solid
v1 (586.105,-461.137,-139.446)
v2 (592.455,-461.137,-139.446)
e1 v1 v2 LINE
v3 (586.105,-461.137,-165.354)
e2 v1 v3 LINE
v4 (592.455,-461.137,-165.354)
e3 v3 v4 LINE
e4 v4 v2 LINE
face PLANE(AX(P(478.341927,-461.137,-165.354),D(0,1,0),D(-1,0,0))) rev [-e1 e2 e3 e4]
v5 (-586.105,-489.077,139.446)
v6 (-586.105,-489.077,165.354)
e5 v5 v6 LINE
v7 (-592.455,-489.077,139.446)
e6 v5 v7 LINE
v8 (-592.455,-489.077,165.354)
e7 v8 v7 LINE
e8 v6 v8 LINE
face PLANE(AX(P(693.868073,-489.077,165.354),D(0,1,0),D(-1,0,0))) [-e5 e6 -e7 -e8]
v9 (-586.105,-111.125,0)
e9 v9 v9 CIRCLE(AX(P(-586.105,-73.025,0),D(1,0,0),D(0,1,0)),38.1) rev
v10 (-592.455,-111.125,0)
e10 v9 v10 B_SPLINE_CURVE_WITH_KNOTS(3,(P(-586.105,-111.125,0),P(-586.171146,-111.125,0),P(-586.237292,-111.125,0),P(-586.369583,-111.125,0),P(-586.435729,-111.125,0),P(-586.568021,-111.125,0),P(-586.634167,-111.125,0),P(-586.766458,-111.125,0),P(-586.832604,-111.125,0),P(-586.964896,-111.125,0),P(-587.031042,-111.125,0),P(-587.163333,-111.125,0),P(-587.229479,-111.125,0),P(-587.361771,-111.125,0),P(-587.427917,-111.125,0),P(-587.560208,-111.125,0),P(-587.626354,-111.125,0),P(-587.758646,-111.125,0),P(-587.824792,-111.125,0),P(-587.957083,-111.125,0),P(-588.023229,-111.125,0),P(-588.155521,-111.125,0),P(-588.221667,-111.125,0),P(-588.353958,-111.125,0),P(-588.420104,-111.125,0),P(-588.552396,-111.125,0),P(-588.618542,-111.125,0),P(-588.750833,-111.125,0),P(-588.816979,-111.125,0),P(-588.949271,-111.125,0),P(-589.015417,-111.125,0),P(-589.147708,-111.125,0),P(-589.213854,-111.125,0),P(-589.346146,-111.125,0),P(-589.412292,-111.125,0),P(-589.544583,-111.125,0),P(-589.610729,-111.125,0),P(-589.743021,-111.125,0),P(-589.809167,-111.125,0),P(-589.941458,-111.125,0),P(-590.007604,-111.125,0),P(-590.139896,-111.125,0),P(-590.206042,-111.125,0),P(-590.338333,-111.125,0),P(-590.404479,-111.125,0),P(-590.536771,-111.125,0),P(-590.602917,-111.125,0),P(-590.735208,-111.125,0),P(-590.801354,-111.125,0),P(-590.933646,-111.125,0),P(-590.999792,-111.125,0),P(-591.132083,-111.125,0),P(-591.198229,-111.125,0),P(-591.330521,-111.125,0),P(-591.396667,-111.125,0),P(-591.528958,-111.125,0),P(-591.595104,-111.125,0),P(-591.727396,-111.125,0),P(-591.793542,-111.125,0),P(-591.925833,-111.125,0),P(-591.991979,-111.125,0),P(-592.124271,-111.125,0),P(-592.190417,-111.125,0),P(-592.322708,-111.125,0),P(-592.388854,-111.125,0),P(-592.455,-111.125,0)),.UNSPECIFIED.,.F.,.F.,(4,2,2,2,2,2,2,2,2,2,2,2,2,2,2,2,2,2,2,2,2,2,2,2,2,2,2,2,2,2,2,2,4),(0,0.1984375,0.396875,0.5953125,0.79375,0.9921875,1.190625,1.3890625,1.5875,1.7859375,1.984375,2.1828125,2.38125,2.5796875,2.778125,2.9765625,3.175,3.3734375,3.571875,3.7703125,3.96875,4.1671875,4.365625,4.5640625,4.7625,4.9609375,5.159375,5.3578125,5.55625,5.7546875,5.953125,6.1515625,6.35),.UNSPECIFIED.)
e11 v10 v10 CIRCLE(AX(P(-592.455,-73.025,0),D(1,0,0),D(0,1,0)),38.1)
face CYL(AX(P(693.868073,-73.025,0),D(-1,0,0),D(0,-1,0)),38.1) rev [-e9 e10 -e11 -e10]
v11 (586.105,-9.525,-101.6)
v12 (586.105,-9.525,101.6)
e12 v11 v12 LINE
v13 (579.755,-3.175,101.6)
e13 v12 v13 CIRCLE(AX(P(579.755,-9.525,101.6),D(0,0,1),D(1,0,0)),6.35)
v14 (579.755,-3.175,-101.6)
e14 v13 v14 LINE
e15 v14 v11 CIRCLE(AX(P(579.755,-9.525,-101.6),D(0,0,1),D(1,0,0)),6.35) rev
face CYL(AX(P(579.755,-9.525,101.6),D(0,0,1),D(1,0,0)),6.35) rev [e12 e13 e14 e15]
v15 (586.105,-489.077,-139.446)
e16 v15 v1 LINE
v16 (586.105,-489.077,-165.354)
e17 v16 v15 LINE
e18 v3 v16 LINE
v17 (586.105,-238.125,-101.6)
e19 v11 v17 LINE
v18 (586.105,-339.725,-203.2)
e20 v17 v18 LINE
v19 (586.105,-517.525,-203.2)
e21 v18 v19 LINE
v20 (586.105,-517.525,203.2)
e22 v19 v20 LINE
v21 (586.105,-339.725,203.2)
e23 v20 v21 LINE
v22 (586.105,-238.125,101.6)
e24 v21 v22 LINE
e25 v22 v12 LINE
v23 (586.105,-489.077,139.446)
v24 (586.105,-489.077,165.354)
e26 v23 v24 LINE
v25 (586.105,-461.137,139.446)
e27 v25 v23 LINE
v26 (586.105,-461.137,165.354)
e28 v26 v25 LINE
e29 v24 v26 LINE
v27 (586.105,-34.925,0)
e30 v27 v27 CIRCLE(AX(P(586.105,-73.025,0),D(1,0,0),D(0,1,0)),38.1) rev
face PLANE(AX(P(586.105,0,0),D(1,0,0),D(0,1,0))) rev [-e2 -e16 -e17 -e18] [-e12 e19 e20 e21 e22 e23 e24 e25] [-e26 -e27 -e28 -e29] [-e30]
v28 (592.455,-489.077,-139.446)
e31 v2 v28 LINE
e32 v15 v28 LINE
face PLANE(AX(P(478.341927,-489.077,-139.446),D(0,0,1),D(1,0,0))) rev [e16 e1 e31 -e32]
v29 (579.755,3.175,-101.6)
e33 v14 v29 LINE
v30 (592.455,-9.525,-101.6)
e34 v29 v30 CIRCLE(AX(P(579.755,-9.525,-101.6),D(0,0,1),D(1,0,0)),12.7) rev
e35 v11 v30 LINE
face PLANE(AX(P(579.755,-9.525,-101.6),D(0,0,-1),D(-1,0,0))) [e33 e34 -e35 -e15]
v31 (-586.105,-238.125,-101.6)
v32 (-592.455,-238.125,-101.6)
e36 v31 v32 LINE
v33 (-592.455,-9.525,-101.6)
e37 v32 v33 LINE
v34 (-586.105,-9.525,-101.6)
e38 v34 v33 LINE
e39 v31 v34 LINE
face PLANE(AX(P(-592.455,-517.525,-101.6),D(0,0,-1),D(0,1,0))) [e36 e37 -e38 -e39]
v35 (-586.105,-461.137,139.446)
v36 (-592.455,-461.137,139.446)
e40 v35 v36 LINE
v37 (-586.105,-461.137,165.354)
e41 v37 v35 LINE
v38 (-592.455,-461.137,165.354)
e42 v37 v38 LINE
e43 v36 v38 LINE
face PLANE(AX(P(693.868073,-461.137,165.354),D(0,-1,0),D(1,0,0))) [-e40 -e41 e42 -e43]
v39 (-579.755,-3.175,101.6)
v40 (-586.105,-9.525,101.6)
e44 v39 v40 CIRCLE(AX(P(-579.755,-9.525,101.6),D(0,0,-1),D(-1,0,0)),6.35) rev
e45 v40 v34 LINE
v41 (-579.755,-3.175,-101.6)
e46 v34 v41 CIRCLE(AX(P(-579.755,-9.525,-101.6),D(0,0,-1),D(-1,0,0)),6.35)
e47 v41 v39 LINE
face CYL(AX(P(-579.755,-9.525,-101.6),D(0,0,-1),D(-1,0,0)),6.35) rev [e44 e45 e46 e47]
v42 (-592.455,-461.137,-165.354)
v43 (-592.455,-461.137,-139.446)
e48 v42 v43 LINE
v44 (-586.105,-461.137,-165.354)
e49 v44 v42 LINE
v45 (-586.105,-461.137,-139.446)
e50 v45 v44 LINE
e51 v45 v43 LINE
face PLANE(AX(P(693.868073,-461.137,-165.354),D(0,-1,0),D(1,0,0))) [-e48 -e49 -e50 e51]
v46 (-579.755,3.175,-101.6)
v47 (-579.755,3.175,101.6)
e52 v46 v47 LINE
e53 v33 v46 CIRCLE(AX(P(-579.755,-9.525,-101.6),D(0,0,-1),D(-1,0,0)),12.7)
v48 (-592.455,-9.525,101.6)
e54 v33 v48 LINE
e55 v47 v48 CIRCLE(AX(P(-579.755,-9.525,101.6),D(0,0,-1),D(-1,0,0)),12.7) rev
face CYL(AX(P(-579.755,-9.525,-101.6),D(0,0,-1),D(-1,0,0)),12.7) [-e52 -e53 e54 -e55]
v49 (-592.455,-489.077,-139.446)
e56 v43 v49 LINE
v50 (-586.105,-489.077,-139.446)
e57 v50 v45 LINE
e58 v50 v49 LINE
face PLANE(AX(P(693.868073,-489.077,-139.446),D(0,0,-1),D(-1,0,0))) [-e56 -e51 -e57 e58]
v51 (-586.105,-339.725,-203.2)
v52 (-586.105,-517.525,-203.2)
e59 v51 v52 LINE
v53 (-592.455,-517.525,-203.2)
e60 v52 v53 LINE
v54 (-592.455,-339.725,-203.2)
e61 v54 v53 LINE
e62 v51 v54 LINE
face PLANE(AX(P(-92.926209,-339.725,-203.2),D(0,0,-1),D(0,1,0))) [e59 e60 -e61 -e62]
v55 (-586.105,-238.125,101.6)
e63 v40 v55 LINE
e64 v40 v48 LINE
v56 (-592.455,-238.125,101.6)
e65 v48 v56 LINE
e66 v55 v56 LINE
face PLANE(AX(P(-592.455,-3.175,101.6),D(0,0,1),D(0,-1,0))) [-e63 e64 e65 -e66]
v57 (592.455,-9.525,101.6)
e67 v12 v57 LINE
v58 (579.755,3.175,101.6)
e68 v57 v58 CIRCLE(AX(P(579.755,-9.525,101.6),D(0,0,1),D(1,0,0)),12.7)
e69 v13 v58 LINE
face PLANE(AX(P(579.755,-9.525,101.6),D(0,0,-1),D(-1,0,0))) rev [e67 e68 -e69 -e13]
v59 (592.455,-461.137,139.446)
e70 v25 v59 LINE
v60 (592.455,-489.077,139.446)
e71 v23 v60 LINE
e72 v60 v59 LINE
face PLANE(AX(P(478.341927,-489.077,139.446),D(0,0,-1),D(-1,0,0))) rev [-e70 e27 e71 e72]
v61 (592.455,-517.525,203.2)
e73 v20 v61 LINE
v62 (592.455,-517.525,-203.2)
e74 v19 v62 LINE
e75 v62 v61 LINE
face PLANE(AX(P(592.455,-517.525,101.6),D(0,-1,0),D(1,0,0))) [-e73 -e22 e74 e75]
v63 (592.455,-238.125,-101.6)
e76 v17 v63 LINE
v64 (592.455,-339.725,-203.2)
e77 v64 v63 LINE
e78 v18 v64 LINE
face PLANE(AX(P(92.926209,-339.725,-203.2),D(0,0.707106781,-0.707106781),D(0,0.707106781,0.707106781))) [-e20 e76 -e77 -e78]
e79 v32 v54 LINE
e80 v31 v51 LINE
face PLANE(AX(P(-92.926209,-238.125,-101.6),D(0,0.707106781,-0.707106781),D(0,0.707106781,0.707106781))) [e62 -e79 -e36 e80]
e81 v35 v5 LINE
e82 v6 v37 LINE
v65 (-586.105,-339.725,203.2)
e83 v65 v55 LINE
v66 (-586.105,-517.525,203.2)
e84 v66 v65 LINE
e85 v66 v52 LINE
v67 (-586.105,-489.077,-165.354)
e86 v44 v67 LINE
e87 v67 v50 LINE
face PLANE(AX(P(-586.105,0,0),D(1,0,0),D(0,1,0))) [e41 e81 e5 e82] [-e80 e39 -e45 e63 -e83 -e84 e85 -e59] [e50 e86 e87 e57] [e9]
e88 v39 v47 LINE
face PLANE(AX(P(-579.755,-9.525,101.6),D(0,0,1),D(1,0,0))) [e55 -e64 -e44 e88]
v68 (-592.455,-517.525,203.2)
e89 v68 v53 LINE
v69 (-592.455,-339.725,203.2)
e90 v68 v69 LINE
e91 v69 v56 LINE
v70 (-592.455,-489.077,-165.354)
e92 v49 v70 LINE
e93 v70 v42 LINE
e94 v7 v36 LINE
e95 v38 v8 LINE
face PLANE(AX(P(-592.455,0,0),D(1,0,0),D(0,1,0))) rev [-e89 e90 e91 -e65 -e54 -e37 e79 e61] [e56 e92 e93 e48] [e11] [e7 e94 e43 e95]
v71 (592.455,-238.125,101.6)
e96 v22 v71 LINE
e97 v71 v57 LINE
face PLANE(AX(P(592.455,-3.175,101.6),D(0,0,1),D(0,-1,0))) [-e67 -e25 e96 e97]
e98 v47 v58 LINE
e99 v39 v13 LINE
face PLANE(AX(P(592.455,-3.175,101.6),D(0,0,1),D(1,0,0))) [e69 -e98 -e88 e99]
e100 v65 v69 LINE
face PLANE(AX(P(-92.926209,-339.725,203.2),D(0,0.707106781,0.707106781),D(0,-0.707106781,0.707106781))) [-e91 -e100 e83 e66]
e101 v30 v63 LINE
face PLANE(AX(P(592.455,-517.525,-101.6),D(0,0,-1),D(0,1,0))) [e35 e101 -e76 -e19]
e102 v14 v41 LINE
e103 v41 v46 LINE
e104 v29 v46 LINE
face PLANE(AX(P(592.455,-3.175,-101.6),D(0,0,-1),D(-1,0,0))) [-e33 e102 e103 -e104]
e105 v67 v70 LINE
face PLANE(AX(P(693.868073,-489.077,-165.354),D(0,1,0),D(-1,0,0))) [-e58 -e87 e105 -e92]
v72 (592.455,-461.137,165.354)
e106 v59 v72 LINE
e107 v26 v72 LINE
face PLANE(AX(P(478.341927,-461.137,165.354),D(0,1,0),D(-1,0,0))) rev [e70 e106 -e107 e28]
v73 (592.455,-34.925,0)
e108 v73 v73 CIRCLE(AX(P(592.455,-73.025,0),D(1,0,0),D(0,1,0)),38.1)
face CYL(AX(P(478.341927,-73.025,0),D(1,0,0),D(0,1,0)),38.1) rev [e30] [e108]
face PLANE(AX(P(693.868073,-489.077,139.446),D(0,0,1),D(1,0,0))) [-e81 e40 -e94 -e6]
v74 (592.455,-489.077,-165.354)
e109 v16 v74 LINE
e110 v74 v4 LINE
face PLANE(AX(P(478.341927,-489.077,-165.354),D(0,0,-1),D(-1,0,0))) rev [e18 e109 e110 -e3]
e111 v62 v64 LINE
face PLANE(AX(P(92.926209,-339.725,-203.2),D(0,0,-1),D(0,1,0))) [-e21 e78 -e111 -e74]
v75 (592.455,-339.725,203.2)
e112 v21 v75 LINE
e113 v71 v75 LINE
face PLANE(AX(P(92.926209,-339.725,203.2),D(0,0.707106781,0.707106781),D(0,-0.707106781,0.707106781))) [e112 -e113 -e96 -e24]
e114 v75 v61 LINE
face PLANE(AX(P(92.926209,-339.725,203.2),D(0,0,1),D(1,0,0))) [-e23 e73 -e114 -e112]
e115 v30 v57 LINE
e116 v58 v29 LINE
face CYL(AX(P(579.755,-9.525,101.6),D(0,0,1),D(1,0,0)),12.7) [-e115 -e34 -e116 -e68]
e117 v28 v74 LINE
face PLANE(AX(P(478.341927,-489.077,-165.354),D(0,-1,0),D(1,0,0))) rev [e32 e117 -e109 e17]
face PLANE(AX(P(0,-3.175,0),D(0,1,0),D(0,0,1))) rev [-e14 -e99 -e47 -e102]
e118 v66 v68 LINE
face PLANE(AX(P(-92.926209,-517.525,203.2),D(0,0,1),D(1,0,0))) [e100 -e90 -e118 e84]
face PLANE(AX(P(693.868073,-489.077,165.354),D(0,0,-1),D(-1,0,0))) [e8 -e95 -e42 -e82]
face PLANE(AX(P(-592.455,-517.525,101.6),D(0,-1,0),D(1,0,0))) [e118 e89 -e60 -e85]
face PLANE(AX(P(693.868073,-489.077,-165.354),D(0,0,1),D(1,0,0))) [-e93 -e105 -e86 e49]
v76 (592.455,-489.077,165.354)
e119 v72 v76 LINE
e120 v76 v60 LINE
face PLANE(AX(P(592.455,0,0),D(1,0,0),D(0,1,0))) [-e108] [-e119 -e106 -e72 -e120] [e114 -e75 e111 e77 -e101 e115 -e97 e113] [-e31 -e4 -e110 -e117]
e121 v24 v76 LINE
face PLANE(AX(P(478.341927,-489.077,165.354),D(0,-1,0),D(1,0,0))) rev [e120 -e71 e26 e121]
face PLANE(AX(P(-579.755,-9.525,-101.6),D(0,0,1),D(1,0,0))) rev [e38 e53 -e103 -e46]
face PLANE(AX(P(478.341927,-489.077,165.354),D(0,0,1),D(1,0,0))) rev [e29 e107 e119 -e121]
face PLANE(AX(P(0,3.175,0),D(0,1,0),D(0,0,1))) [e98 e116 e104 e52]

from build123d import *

# Parameters (mm, degrees)
BASE_FLANGE1_START             = -3.175
BASE_FLANGE1_OUTLINE_W         = 1184.91
BASE_FLANGE1_OUTLINE_H         = 203.2
BASE_FLANGE1_DEPTH             = 6.35
EDGE_FLANGE1_STRIP_W           = 48.1
EDGE_FLANGE1_STRIP_H           = 6.35
EDGE_FLANGE1_STRIP_CUT_DEPTH   = 203.2
EDGE_FLANGE1_STRIP_2_W         = 48.1
EDGE_FLANGE1_STRIP_2_H         = 6.35
EDGE_FLANGE1_STRIP_CUT_2_DEPTH = 203.2
EDGE_FLANGE1_DEPTH             = 203.2
EDGE_FLANGE1_BEND_DEPTH        = 203.2
BOSS_EXTRUDE1_START            = -6.35
BOSS_EXTRUDE1_DEPTH            = 6.35
CUT_EXTRUDE1_REACH             = 1310.867
SKETCH13_R                     = 38.1
SKETCH13_W                     = 25.908
SKETCH13_H                     = 27.94
BOSS_EXTRUDE2_DEPTH            = 6.35
MIRROR3_START                  = -165.354
MIRROR3_OUTLINE_W              = 6.35
MIRROR3_OUTLINE_H              = 27.94
MIRROR3_DEPTH                  = 25.908
MIRROR3_START_2                = 139.446
MIRROR3_2_OUTLINE_W            = 6.35
MIRROR3_2_OUTLINE_H            = 27.94
MIRROR3_2_DEPTH                = 25.908


# Read off the part's stored shape, not the designer's step: Base-Flange1, Mirror3
# Sheet-metal steps are written as plain solids
with BuildPart() as part:
    # Base-Flange1 outline → Base-Flange1 (new body)
    with BuildSketch(Plane(origin=(0, 0, 0), x_dir=(1, 0, 0), z_dir=(0, 1, 0)).offset(BASE_FLANGE1_START)):
        Rectangle(BASE_FLANGE1_OUTLINE_W, BASE_FLANGE1_OUTLINE_H)
    extrude(amount=BASE_FLANGE1_DEPTH)

    # Edge-Flange1 strip (across the edge) → Edge-Flange1 strip cut (cut)
    with BuildSketch(Plane(origin=(592.455, -3.175, -101.6), x_dir=(-1, 0, 0), z_dir=(0, 0, 1))):
        with Locations((-11.35, -3.175)):
            Rectangle(EDGE_FLANGE1_STRIP_W, EDGE_FLANGE1_STRIP_H)
    extrude(amount=EDGE_FLANGE1_STRIP_CUT_DEPTH, mode=Mode.SUBTRACT)

    # Edge-Flange1 strip 2 (across the edge) → Edge-Flange1 strip cut 2 (cut)
    with BuildSketch(Plane(origin=(-592.455, -3.175, 101.6), x_dir=(1, 0, 0), z_dir=(0, 0, -1))):
        with Locations((-11.35, -3.175)):
            Rectangle(EDGE_FLANGE1_STRIP_2_W, EDGE_FLANGE1_STRIP_2_H)
    extrude(amount=EDGE_FLANGE1_STRIP_CUT_2_DEPTH, mode=Mode.SUBTRACT)

    # Edge-Flange1 section (across the edge) → Edge-Flange1 (add)
    with BuildSketch(Plane(origin=(592.455, -3.175, -101.6), x_dir=(-1, 0, 0), z_dir=(0, 0, 1))):
        with BuildLine():
            Line((0, 6.35), (0, 514.35))
            Line((0, 514.35), (6.35, 514.35))
            Line((6.35, 514.35), (6.35, 6.35))
            ThreePointArc((6.35, 6.35), (8.209871939, 1.859871939), (12.7, 0))
            Line((12.7, 0), (12.7, -6.35))
            ThreePointArc((12.7, -6.35), (3.719743879, -2.630256121), (0, 6.35))
        make_face()
    extrude(amount=EDGE_FLANGE1_DEPTH)

    # Edge-Flange1 section 2 (across the edge) → Edge-Flange1 bend (add)
    with BuildSketch(Plane(origin=(-592.455, -3.175, 101.6), x_dir=(1, 0, 0), z_dir=(0, 0, -1))):
        with BuildLine():
            Line((0, 6.35), (0, 514.35))
            Line((0, 514.35), (6.35, 514.35))
            Line((6.35, 514.35), (6.35, 6.35))
            ThreePointArc((6.35, 6.35), (8.209871939, 1.859871939), (12.7, 0))
            Line((12.7, 0), (12.7, -6.35))
            ThreePointArc((12.7, -6.35), (3.719743879, -2.630256121), (0, 6.35))
        make_face()
    extrude(amount=EDGE_FLANGE1_BEND_DEPTH)

    # Sketch12 → Boss-Extrude1 (add)
    with BuildSketch(Plane(origin=(592.455, 0, 0), x_dir=(0, 0, -1), z_dir=(1, 0, 0)).offset(BOSS_EXTRUDE1_START)):
        Polygon((-101.6, -238.125), (-203.2, -339.725), (-203.2, -517.525), (-101.6, -517.525), align=None)
        Polygon((203.2, -339.725), (101.6, -238.125), (101.6, -517.525), (203.2, -517.525), align=None)
    extrude(amount=BOSS_EXTRUDE1_DEPTH)

    # Sketch13 → Cut-Extrude1 (cut, up to next)
    with BuildSketch(Plane(origin=(592.455, 0, 0), x_dir=(0, 0, -1), z_dir=(1, 0, 0)), mode=Mode.PRIVATE) as cut_extrude1_sk1:
        with Locations(Location((0, -73.025, 0), (0, 0, 90))):
            Circle(SKETCH13_R)
    cut_extrude1_tool1 = extrude(cut_extrude1_sk1.sketch, amount=-CUT_EXTRUDE1_REACH, mode=Mode.PRIVATE) & part.part
    # Sketch13 → Cut-Extrude1 (cut, up to next)
    with BuildSketch(Plane(origin=(592.455, 0, 0), x_dir=(0, 0, -1), z_dir=(1, 0, 0)), mode=Mode.PRIVATE) as cut_extrude1_sk2:
        with Locations((152.4, -475.107)):
            Rectangle(SKETCH13_W, SKETCH13_H)
    cut_extrude1_tool2 = extrude(cut_extrude1_sk2.sketch, amount=-CUT_EXTRUDE1_REACH, mode=Mode.PRIVATE) & part.part
    # Sketch13 → Cut-Extrude1 (cut, up to next)
    with BuildSketch(Plane(origin=(592.455, 0, 0), x_dir=(0, 0, -1), z_dir=(1, 0, 0)), mode=Mode.PRIVATE) as cut_extrude1_sk3:
        with Locations((-152.4, -475.107)):
            Rectangle(SKETCH13_W, SKETCH13_H)
    cut_extrude1_tool3 = extrude(cut_extrude1_sk3.sketch, amount=-CUT_EXTRUDE1_REACH, mode=Mode.PRIVATE) & part.part
    cut_extrude1_1 = cut_extrude1_tool1.solids().sort_by_distance((592.455, -73.025, 0))[0]
    add(cut_extrude1_1, mode=Mode.SUBTRACT)
    cut_extrude1_2 = cut_extrude1_tool2.solids().sort_by_distance((592.455, -475.107, -152.4))[0]
    add(cut_extrude1_2, mode=Mode.SUBTRACT)
    cut_extrude1_3 = cut_extrude1_tool3.solids().sort_by_distance((592.455, -475.107, 152.4))[0]
    add(cut_extrude1_3, mode=Mode.SUBTRACT)
    cut_extrude1 = cut_extrude1_1 + cut_extrude1_2 + cut_extrude1_3  # Cut-Extrude1 as one shape, for the pattern or mirror that repeats it

    # Mirror1: Cut-Extrude1 across plane
    add(cut_extrude1.mirror(Plane(origin=(0, 0, 0), x_dir=(0, 0, 1), z_dir=(1, 0, 0))), mode=Mode.SUBTRACT)

    # Sketch14 → Boss-Extrude2 (add)
    with BuildSketch(Plane.ZY.offset(592.455)):
        Polygon((203.2, -517.525), (203.2, -339.725), (101.6, -238.125), (-101.6, -238.125), (-203.2, -339.725), (-203.2, -517.525), align=None)
    extrude(amount=-BOSS_EXTRUDE2_DEPTH)

    # Mirror3 outline → Mirror3 (cut)
    with BuildSketch(Plane.XY.offset(MIRROR3_START)):
        with Locations((-589.28, -475.107)):
            Rectangle(MIRROR3_OUTLINE_W, MIRROR3_OUTLINE_H)
    extrude(amount=MIRROR3_DEPTH, mode=Mode.SUBTRACT)

    # Mirror3 2 outline → Mirror3 2 (cut)
    with BuildSketch(Plane.XY.offset(MIRROR3_START_2)):
        with Locations((-589.28, -475.107)):
            Rectangle(MIRROR3_2_OUTLINE_W, MIRROR3_2_OUTLINE_H)
    extrude(amount=MIRROR3_2_DEPTH, mode=Mode.SUBTRACT)


solid = part.part
